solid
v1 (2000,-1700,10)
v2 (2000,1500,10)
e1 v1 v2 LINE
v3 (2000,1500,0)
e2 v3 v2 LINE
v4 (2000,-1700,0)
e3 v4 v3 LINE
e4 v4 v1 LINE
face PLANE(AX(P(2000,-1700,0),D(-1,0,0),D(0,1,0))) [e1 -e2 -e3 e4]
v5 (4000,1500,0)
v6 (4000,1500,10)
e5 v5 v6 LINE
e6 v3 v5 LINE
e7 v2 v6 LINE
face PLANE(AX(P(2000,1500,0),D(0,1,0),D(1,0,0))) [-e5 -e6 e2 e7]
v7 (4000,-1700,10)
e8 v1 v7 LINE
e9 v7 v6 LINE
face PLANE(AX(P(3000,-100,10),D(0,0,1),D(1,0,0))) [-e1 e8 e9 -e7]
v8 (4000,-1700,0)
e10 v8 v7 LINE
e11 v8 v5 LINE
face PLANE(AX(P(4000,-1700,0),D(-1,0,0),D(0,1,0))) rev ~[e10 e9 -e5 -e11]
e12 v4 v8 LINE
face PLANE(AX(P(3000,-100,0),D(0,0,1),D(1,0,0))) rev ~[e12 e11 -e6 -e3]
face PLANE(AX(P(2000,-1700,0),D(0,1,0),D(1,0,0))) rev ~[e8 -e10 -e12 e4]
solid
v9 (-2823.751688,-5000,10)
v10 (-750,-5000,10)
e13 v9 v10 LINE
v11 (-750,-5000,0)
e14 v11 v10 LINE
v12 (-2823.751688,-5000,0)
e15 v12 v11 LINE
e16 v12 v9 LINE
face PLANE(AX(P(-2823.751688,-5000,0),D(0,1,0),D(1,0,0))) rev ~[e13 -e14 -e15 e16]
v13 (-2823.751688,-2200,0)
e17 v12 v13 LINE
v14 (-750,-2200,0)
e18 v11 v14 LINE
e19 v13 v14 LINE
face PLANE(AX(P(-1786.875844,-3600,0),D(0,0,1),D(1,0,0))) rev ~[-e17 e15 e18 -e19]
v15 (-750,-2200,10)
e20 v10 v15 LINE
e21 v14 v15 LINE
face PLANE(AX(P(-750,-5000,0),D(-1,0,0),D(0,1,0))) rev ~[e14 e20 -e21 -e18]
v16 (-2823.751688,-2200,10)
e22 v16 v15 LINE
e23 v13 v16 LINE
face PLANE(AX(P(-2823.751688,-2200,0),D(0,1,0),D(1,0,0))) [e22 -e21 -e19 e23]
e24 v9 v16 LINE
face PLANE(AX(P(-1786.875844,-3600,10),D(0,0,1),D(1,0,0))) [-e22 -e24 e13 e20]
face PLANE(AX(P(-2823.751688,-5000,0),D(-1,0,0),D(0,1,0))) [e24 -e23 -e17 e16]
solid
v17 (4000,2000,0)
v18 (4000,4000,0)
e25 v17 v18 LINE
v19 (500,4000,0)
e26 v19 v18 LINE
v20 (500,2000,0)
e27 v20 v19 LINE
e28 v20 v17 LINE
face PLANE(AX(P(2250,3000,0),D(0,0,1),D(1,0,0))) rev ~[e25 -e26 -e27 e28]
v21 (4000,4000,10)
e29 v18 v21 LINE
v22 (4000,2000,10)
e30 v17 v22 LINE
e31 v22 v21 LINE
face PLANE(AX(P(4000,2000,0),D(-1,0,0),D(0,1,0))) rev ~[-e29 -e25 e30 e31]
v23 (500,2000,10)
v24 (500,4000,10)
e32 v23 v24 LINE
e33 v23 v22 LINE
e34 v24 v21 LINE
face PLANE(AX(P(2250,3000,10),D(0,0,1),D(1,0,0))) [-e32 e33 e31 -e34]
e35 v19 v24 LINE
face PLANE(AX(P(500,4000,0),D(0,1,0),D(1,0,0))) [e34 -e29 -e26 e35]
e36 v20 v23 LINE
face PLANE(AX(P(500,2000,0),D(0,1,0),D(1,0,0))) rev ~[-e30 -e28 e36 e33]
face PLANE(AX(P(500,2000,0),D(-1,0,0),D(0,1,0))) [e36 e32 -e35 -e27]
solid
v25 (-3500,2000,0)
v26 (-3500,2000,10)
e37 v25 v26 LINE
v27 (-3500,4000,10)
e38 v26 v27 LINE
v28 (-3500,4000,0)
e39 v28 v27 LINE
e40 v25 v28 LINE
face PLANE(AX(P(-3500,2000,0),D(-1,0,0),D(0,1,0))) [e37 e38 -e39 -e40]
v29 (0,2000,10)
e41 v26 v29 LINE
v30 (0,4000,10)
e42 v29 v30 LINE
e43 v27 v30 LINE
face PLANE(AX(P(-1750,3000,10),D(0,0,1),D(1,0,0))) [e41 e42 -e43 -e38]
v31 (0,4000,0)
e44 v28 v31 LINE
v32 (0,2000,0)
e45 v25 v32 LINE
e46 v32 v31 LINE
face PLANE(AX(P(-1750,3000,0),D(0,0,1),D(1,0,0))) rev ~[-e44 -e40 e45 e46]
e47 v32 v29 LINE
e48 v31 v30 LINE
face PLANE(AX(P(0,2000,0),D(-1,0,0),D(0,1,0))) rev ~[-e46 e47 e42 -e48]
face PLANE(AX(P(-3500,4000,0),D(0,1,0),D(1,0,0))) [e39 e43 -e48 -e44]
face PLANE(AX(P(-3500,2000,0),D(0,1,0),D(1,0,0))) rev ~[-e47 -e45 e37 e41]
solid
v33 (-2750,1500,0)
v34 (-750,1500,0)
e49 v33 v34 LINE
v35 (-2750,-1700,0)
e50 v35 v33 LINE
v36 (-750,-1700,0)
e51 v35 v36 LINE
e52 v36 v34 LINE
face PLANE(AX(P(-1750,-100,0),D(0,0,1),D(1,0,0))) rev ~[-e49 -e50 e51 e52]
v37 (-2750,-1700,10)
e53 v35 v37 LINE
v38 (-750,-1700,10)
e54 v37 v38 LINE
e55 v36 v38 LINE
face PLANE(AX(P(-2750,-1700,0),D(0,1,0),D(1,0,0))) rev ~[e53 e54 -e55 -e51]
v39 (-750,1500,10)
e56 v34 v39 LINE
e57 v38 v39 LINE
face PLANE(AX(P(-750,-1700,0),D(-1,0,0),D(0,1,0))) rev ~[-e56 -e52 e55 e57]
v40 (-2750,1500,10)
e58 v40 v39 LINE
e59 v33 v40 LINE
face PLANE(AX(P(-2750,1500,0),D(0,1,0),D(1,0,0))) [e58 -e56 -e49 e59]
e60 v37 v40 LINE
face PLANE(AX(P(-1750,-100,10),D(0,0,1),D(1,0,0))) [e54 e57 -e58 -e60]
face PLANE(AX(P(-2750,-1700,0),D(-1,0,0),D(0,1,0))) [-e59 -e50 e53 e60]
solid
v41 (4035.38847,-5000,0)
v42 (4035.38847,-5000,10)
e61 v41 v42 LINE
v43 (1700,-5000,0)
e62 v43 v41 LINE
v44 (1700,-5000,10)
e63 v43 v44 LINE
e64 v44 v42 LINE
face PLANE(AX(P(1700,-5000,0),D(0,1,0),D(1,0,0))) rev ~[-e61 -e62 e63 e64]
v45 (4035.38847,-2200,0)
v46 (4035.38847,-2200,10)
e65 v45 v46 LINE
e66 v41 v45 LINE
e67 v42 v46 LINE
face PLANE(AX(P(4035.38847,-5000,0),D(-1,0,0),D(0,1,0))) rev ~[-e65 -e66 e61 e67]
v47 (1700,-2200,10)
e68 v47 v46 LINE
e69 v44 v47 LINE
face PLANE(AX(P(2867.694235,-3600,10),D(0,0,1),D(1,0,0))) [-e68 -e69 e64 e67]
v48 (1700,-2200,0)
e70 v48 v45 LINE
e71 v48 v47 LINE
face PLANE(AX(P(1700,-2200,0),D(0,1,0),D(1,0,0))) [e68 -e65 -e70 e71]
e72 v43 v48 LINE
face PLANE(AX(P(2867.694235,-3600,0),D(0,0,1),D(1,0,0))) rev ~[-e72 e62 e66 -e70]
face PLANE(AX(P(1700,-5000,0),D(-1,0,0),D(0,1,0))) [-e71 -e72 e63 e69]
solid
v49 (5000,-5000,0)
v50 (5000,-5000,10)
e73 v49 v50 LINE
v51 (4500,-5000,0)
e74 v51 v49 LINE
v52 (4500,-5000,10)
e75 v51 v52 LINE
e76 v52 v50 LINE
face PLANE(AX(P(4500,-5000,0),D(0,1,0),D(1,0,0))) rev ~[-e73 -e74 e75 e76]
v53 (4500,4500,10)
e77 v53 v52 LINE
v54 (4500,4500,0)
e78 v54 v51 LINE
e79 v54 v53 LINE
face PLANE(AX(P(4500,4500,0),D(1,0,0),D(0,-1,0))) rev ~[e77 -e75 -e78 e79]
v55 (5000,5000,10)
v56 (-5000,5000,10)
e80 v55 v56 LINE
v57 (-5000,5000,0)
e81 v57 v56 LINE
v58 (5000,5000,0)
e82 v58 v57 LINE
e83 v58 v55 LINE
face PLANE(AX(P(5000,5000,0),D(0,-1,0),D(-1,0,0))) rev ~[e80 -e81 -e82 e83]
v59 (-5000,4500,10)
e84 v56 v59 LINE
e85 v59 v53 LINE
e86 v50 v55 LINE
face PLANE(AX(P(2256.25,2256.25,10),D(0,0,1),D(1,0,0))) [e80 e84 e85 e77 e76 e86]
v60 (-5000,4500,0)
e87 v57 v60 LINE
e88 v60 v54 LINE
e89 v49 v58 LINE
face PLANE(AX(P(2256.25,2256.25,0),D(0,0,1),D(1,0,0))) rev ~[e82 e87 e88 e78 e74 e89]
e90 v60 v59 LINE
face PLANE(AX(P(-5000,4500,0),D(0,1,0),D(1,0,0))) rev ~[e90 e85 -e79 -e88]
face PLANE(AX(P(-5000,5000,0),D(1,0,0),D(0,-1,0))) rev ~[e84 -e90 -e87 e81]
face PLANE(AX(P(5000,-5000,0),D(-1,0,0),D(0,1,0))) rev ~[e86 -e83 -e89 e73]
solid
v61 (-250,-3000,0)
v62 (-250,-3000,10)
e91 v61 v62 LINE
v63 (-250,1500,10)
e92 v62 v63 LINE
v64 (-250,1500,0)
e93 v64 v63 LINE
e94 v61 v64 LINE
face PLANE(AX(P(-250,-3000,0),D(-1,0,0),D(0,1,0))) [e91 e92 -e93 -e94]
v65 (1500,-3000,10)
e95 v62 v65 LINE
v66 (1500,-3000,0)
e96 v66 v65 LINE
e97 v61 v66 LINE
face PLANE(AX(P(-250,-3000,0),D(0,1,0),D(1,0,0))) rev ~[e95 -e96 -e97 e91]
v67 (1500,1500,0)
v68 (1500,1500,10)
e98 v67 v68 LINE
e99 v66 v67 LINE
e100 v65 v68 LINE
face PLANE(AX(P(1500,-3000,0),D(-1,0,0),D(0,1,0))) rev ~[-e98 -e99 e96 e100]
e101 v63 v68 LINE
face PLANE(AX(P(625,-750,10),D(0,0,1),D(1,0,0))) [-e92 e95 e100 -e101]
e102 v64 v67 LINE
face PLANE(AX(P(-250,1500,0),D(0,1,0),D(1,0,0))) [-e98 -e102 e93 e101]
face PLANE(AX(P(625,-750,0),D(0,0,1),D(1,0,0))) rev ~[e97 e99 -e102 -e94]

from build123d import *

# Parameters (mm, degrees)
F2_W     = 2073.7516880035
F2_H     = 2800
F3_DEPTH = 10
F2_W_2   = 2335.388469696
F2_W_3   = 1750
F2_H_2   = 4500
F2_W_4   = 2000
F2_H_3   = 3200
F2_W_5   = 3500
F2_H_4   = 2000
F4_DEPTH = 10


# Not quite as in the source:
# - the program builds the solid bodies; features that only make, move or delete a surface that nothing else refers to are left out


with BuildPart() as f3:
    # F2 (on face) → F3 (new body)
    with BuildSketch(Plane.XY):
        with Locations((-1786.8758440018, -3600)):
            Rectangle(F2_W, F2_H)
    extrude(amount=F3_DEPTH)


with BuildPart() as f3b:
    # F2 (on face) → F3, piece 2 (new body)
    with BuildSketch(Plane.XY):
        with Locations((2867.694234848, -3600)):
            Rectangle(F2_W_2, F2_H)
    extrude(amount=F3_DEPTH)


with BuildPart() as f3c:
    # F2 (on face) → F3, piece 3 (new body)
    with BuildSketch(Plane.XY):
        with Locations((625, -750)):
            Rectangle(F2_W_3, F2_H_2)
    extrude(amount=F3_DEPTH)


with BuildPart() as f3d:
    # F2 (on face) → F3, piece 4 (new body)
    with BuildSketch(Plane.XY):
        with Locations((3000, -100)):
            Rectangle(F2_W_4, F2_H_3)
    extrude(amount=F3_DEPTH)


with BuildPart() as f3e:
    # F2 (on face) → F3, piece 5 (new body)
    with BuildSketch(Plane.XY):
        with Locations((-1750, -100)):
            Rectangle(F2_W_4, F2_H_3)
    extrude(amount=F3_DEPTH)


with BuildPart() as f3f:
    # F2 (on face) → F3, piece 6 (new body)
    with BuildSketch(Plane.XY):
        with Locations((-1750, 3000)):
            Rectangle(F2_W_5, F2_H_4)
    extrude(amount=F3_DEPTH)


with BuildPart() as f3g:
    # F2 (on face) → F3, piece 7 (new body)
    with BuildSketch(Plane.XY):
        with Locations((2250, 3000)):
            Rectangle(F2_W_5, F2_H_4)
    extrude(amount=F3_DEPTH)


with BuildPart() as f4:
    # F1 (on face) → F4 (new body)
    with BuildSketch(Plane.XY):
        Polygon((4500, 4500), (4500, -5000), (5000, -5000), (5000, 5000), (-5000, 5000), (-5000, 4500), align=None)
    extrude(amount=F4_DEPTH)


solid = Compound([f3.part, f3b.part, f3c.part, f3d.part, f3e.part, f3f.part, f3g.part, f4.part])
